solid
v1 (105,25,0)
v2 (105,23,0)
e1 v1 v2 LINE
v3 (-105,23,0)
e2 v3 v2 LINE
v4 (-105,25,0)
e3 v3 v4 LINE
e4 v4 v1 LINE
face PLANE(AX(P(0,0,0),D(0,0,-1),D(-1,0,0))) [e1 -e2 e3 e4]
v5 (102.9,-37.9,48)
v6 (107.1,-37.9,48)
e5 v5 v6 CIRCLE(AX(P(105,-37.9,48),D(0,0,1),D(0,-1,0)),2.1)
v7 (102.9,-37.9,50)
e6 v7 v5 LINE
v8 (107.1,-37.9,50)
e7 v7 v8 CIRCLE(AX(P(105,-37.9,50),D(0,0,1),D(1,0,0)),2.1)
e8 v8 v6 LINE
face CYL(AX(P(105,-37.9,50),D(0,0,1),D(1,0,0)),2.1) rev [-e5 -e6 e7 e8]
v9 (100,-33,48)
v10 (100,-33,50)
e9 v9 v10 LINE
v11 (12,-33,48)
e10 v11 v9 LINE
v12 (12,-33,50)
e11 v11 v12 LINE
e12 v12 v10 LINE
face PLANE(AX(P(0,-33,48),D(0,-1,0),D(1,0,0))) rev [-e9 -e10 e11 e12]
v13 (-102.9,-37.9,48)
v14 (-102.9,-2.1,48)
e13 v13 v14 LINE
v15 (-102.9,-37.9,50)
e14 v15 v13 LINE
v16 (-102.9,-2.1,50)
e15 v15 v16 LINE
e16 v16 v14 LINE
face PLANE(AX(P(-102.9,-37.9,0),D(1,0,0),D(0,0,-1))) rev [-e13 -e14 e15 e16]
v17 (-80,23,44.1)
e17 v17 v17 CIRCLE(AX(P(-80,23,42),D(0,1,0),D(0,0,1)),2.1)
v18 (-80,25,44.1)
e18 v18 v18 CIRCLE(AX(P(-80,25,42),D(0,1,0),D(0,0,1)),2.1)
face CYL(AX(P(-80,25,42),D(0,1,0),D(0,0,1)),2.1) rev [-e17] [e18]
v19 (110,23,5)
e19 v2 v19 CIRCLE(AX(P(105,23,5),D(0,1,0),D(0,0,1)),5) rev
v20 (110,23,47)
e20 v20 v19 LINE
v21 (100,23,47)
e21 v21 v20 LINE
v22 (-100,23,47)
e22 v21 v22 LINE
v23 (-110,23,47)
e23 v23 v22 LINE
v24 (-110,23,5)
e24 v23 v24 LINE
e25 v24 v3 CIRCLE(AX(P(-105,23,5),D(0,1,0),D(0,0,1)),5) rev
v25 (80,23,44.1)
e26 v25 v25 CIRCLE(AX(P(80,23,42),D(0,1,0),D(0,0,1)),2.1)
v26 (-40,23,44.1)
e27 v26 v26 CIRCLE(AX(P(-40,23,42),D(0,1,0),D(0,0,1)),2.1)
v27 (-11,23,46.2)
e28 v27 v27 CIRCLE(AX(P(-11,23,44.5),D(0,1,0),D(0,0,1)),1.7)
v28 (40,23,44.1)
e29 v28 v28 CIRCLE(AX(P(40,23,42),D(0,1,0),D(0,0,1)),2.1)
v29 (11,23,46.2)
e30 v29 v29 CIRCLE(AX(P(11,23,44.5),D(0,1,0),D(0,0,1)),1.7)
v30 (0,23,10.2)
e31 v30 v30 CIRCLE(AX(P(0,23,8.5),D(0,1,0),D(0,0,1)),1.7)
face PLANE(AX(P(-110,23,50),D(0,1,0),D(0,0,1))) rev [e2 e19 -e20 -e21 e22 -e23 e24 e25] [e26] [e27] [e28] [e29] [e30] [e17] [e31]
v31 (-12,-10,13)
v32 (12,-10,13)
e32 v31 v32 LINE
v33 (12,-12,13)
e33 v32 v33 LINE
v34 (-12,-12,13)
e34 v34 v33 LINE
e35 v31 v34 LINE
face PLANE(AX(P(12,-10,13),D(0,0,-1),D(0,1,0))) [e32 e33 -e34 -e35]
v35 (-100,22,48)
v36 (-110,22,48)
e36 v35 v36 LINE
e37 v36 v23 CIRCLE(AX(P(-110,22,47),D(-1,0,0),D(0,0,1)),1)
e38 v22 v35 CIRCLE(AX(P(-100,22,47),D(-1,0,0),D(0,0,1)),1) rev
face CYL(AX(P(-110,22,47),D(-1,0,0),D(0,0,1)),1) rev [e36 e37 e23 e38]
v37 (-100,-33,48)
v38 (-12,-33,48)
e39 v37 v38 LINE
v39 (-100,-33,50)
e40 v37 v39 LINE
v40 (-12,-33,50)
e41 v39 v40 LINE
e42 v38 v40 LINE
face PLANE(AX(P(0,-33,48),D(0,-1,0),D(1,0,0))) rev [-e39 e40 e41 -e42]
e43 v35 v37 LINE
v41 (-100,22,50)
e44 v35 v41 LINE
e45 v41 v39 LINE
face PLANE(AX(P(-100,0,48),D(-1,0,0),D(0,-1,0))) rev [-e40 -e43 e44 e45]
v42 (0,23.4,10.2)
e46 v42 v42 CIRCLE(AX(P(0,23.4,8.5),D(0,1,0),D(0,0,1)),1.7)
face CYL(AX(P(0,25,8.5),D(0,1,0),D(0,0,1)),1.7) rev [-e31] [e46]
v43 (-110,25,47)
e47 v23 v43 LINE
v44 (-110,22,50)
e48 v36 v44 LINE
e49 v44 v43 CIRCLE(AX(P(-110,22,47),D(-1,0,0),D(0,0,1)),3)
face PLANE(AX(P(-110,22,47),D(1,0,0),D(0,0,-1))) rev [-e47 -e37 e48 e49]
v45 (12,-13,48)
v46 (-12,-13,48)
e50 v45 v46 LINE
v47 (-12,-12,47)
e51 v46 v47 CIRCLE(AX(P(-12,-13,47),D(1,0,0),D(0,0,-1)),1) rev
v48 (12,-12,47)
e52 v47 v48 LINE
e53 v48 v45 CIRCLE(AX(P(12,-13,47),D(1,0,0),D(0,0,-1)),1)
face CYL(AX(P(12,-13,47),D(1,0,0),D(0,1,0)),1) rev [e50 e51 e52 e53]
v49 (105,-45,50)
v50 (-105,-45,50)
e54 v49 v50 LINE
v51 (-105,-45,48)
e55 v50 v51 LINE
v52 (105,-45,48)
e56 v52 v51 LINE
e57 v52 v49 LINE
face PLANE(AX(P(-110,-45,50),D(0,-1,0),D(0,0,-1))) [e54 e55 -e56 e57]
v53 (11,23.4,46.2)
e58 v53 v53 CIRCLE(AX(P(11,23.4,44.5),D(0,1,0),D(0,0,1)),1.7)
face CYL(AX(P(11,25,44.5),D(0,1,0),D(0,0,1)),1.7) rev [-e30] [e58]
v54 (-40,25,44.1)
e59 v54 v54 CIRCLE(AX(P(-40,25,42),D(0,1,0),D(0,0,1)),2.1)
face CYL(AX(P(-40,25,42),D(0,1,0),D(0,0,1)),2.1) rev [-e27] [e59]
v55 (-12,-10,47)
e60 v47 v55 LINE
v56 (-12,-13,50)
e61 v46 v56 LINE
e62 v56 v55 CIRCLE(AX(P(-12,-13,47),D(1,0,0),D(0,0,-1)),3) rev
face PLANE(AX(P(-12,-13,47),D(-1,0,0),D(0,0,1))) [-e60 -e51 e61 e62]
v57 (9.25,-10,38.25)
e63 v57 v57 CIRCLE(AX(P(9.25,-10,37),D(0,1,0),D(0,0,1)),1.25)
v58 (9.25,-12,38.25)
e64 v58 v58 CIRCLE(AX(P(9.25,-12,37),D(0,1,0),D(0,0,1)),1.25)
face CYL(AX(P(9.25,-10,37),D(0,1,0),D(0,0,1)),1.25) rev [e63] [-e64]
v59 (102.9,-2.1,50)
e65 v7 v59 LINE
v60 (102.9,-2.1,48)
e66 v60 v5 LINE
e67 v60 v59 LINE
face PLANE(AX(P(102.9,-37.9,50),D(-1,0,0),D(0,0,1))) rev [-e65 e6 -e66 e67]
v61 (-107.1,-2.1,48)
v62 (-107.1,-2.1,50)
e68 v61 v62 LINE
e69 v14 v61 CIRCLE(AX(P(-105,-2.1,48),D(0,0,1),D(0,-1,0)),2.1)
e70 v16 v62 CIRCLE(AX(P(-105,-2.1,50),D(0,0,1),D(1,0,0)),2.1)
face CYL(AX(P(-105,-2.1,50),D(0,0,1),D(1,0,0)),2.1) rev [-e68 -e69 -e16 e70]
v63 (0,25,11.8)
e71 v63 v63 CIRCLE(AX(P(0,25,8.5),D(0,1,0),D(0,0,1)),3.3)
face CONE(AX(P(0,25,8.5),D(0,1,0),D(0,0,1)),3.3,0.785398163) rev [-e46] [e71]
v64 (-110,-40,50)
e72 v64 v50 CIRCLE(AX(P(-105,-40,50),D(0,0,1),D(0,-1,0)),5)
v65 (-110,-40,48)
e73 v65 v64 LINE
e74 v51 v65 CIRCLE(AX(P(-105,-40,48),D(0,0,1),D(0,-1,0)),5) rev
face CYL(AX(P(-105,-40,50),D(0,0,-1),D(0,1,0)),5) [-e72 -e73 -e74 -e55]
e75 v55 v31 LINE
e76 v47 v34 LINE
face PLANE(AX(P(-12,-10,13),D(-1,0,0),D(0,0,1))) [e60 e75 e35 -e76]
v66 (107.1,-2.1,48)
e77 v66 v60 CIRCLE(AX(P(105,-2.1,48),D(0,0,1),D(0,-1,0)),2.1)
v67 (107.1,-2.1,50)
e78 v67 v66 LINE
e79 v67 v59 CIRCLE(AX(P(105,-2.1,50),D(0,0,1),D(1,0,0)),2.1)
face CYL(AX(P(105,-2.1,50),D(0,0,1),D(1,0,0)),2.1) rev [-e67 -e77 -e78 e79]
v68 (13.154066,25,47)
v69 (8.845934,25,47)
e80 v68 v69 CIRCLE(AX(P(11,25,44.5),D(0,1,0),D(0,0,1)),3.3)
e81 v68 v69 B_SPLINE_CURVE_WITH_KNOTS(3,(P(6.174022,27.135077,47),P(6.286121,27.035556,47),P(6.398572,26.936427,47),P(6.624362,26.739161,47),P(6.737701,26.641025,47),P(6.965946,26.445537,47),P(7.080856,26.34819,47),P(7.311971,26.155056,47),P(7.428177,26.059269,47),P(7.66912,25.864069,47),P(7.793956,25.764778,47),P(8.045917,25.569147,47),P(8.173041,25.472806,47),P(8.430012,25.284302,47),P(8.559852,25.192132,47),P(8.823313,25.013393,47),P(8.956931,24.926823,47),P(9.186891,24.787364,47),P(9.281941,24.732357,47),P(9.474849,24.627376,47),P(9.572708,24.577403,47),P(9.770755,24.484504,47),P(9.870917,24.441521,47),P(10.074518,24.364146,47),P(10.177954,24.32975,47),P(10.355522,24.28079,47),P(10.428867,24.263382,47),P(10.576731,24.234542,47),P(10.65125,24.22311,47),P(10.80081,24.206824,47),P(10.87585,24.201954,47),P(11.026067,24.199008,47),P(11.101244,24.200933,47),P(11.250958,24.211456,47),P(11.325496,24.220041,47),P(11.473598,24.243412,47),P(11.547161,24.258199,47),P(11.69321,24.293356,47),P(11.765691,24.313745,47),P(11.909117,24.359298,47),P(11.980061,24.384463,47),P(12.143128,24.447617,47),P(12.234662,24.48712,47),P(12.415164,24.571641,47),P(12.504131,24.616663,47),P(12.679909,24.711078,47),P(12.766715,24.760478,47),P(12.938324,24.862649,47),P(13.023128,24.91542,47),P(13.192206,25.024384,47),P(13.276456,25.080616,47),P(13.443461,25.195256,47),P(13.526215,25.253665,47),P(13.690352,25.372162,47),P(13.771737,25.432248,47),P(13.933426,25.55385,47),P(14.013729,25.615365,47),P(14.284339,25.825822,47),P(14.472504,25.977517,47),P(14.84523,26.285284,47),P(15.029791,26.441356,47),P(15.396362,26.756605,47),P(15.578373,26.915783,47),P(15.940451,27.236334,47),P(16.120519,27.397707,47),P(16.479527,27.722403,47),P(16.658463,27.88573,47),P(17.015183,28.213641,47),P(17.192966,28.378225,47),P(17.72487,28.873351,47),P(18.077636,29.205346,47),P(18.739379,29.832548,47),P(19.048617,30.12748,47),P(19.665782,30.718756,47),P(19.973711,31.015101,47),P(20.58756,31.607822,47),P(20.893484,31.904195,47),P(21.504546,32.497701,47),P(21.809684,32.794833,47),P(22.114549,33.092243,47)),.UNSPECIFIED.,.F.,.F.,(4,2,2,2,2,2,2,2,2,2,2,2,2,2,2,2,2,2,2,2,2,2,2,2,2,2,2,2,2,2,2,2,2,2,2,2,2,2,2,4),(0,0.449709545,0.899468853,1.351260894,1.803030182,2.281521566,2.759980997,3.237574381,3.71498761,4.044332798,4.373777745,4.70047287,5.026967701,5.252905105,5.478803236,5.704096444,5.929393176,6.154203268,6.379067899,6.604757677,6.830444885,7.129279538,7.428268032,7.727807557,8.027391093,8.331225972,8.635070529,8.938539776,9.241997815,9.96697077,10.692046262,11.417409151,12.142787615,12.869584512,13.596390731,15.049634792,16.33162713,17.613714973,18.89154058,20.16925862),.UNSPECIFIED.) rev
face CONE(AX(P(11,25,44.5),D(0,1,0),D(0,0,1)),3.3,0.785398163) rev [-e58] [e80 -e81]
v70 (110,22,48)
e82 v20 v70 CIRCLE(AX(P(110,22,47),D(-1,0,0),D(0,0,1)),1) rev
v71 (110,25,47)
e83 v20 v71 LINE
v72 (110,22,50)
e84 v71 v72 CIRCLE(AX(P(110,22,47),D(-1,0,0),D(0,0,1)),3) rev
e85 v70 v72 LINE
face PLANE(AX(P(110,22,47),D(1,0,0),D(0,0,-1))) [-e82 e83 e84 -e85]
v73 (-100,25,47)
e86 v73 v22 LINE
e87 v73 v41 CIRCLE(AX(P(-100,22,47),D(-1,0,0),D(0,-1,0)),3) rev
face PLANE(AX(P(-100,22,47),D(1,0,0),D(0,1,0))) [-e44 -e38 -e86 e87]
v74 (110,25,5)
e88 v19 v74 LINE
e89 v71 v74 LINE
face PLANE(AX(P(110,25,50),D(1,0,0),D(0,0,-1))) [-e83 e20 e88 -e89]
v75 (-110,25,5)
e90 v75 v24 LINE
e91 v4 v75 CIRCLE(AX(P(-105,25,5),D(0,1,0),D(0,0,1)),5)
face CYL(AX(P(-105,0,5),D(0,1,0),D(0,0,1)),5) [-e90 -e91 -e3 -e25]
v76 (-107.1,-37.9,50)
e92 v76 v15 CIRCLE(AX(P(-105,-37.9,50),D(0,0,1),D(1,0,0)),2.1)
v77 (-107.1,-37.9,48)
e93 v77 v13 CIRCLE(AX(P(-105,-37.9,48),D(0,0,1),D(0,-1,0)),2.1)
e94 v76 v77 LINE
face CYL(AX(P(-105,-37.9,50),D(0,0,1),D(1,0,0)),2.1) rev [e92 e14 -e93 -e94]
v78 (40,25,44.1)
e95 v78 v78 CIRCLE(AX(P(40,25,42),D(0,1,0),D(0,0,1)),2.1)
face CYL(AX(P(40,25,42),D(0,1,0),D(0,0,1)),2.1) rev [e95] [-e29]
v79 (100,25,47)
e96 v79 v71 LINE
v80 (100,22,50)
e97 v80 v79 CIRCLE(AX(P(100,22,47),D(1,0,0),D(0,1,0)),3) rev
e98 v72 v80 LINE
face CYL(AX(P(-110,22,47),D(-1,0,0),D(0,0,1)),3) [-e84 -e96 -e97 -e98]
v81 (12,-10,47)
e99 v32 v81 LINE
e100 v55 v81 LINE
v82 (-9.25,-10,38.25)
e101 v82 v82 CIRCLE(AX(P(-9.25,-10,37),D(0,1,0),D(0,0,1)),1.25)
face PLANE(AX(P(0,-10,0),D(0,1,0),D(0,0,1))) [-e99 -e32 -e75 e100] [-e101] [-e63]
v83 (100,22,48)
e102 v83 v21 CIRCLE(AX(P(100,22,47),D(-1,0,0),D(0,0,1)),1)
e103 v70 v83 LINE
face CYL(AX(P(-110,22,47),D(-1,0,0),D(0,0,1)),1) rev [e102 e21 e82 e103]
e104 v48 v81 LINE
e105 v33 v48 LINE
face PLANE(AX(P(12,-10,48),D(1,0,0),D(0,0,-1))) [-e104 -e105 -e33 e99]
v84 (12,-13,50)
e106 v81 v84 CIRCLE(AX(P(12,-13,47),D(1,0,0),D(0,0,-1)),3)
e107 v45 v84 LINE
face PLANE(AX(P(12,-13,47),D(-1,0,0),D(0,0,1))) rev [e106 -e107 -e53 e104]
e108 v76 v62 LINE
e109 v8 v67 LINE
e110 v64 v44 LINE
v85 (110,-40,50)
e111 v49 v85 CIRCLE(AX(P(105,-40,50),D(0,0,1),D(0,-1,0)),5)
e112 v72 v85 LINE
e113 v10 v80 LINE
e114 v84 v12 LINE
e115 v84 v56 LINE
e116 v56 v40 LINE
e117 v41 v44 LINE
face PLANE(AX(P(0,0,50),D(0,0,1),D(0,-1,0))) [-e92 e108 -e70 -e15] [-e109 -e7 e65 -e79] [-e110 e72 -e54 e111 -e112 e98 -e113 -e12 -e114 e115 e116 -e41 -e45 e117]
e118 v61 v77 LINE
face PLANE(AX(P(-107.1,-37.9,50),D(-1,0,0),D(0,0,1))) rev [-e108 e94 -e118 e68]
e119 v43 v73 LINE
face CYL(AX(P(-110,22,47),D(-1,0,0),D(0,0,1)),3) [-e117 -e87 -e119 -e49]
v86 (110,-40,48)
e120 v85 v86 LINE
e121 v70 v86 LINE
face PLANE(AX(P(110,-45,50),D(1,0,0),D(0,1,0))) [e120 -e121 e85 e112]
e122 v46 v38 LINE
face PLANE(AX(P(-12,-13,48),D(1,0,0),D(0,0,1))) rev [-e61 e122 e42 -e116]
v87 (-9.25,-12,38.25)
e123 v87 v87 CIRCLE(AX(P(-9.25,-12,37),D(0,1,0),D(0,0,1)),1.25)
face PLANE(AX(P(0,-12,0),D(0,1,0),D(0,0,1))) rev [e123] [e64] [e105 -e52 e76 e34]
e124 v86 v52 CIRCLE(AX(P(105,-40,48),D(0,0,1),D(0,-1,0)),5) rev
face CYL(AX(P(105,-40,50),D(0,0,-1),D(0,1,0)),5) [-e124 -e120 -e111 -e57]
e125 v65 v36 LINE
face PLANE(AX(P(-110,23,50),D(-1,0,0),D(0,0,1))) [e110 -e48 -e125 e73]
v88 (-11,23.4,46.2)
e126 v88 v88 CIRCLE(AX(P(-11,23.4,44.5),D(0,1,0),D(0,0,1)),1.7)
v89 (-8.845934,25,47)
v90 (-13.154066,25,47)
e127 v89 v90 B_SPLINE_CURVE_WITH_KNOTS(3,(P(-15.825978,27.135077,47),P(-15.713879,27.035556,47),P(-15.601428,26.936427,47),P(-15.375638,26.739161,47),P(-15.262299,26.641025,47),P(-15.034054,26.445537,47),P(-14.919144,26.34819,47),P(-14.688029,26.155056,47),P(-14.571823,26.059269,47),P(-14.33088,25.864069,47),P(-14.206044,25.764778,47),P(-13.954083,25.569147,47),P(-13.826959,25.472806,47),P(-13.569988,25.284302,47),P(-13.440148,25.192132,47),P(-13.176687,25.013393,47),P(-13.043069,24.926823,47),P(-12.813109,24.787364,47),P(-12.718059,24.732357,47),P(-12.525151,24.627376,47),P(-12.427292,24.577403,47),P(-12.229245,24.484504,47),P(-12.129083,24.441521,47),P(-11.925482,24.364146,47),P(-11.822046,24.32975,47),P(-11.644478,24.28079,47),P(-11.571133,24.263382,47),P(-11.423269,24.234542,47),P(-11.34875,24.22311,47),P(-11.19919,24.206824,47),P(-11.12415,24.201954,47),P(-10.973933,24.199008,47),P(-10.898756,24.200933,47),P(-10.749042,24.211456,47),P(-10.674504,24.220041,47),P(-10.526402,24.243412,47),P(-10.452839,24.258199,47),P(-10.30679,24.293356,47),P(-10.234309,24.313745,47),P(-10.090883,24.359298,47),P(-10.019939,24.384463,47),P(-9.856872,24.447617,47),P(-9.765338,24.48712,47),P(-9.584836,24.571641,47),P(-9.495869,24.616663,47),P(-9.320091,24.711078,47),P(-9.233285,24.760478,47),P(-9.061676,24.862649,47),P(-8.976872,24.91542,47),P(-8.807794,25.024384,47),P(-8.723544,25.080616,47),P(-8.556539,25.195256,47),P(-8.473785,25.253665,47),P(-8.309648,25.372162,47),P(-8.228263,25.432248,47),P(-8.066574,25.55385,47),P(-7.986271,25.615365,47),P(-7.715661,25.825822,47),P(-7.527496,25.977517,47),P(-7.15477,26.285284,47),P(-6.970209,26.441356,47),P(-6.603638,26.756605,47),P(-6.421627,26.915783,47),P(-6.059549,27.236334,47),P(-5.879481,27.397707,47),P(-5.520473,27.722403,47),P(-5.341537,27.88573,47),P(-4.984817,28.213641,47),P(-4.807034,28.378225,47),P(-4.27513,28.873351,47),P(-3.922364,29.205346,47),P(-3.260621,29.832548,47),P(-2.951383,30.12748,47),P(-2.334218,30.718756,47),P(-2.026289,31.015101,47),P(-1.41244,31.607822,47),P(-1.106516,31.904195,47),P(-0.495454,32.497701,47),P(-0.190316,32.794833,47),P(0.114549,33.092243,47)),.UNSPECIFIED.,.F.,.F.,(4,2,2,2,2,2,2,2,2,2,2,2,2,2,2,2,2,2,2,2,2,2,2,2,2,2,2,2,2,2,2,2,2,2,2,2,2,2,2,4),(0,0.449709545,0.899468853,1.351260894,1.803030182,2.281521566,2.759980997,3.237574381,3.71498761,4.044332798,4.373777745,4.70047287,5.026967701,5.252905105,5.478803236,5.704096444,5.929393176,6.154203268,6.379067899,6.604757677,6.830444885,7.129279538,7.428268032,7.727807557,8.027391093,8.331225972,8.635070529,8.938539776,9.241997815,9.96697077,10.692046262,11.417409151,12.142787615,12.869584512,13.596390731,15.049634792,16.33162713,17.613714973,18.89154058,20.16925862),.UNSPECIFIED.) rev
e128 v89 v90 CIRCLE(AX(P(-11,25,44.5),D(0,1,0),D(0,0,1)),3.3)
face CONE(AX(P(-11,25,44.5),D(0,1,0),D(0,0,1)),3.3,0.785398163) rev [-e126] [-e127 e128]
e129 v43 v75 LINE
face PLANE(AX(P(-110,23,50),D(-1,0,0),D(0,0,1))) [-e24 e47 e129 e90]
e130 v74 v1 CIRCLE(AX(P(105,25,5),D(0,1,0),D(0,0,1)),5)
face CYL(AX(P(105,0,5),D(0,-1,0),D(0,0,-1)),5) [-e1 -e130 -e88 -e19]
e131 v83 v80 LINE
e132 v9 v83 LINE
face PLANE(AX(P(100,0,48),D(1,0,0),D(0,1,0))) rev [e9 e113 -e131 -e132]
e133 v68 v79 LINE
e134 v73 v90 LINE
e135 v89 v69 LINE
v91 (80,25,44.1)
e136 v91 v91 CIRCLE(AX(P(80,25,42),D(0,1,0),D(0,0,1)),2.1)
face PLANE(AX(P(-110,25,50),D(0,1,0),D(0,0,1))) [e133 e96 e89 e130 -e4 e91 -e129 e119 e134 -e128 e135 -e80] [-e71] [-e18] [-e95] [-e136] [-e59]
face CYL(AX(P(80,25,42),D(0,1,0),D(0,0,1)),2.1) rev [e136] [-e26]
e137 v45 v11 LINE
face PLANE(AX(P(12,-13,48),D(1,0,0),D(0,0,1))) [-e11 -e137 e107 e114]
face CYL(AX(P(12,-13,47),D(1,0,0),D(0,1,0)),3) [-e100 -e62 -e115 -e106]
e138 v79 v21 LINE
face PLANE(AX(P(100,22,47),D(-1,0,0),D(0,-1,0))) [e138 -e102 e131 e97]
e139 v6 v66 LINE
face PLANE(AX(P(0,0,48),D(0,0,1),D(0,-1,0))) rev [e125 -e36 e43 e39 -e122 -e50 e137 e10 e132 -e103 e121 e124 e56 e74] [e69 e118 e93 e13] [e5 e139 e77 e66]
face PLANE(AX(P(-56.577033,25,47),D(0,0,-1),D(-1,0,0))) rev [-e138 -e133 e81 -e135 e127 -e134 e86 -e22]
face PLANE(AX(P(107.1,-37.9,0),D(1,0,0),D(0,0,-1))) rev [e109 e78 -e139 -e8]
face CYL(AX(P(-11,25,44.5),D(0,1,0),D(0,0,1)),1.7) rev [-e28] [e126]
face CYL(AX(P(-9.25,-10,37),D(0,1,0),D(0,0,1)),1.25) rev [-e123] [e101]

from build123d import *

# Parameters (mm, degrees)
SM_BASE_FLANGE_1_OUTLINE_W       = 220
SM_BASE_FLANGE_1_OUTLINE_H       = 2
SM_BASE_FLANGE_1_DEPTH           = 50
HOLE_WIZARD_1_AT_2_COUNT         = 2
HOLE_WIZARD_1_AT_2_PITCH         = 37.643060449
HOLE_WIZARD_1_AT_3_COUNT         = 2
HOLE_WIZARD_1_AT_3_PITCH         = 37.643060449
HOLE_WIZARD_4_2_4_2_1_D          = 4.2
SM_EDGE_FLANGE_1_STRIP_W         = 10
SM_EDGE_FLANGE_1_STRIP_H         = 2
SM_EDGE_FLANGE_1_STRIP_CUT_DEPTH = 220
SM_EDGE_FLANGE_1_DEPTH           = 220
SKETCH_16_W                      = 200
SKETCH_16_H                      = 58
CUT_EXTRUDE_1_DEPTH              = 3
SM_EDGE_FLANGE_2_DEPTH           = 24
HOLE_START                       = 48
HOLE_WIZARD_4_2_4_2_1_2_DEPTH    = 2
FILLET_1_R                       = 5
SKETCH_23_W                      = 1.25
SKETCH_23_H                      = 35
HOLE_WIZARD_M3_1_AT_2_COUNT      = 2
HOLE_WIZARD_M3_1_AT_2_PITCH      = 18.5


# Read off the part's stored shape, not the designer's step: 基体-法兰1, Ø4.2 (4.2) 直径槽口1
# Sheet-metal steps are written as plain solids
with BuildPart() as part:
    # 基体-法兰1 outline → 基体-法兰1 (new body)
    with BuildSketch(Plane.XY):
        with Locations((0, 24)):
            Rectangle(SM_BASE_FLANGE_1_OUTLINE_W, SM_BASE_FLANGE_1_OUTLINE_H)
    extrude(amount=SM_BASE_FLANGE_1_DEPTH)

    # 草图9 → 打孔尺寸(%根据)开槽沉头木螺钉的类型1 (revolve, cut)
    with BuildSketch(Plane(origin=(0, 25, 8.5), x_dir=(0, 0, 1), z_dir=(1, 0, 0))):
        Polygon((0, 0), (0, 2), (1.7, 2), (1.7, 1.6), (3.3, 0), align=None)
    hole_wizard_1 = revolve(axis=Axis((0, 31.35, 8.5), (0, -1, 0)), mode=Mode.SUBTRACT)

    # 打孔尺寸(%根据)开槽沉头木螺钉的类型1 at 2: 打孔尺寸(%根据)开槽沉头木螺钉的类型1 ×2
    with Locations(*[Vector(-0.2922185355990202, 0, 0.956351571051339) * (i * HOLE_WIZARD_1_AT_2_PITCH) for i in range(1, HOLE_WIZARD_1_AT_2_COUNT)]):
        add(hole_wizard_1, mode=Mode.SUBTRACT)

    # 打孔尺寸(%根据)开槽沉头木螺钉的类型1 at 3: 打孔尺寸(%根据)开槽沉头木螺钉的类型1 ×2
    with Locations(*[Vector(0.29221853559902033, 0, 0.956351571051339) * (i * HOLE_WIZARD_1_AT_3_PITCH) for i in range(1, HOLE_WIZARD_1_AT_3_COUNT)]):
        add(hole_wizard_1, mode=Mode.SUBTRACT)

    # Hole Wizard 4.2 _4.2_ _1 (through all)
    with Locations(Plane(origin=(0, 25, 0), x_dir=(1, 0, 0), z_dir=(0, 1, 0))):
        with Locations((-40, -42), (-80, -42), (40, -42), (80, -42)):
            Hole(HOLE_WIZARD_4_2_4_2_1_D / 2)

    # 边线-法兰1 strip (across the edge) → 边线-法兰1 strip cut (cut)
    with BuildSketch(Plane(origin=(110, 23, 50), x_dir=(0, 0, -1), z_dir=(-1, 0, 0))):
        with Locations((-2, -1)):
            Rectangle(SM_EDGE_FLANGE_1_STRIP_W, SM_EDGE_FLANGE_1_STRIP_H)
    extrude(amount=SM_EDGE_FLANGE_1_STRIP_CUT_DEPTH, mode=Mode.SUBTRACT)

    # 边线-法兰1 section (across the edge) → 边线-法兰1 (add)
    with BuildSketch(Plane(origin=(110, 23, 50), x_dir=(0, 0, -1), z_dir=(-1, 0, 0))):
        with BuildLine():
            Line((0, 1), (0, 68))
            Line((0, 68), (2, 68))
            Line((2, 68), (2, 1))
            ThreePointArc((2, 1), (2.292893219, 0.292893219), (3, 0))
            Line((3, 0), (3, -2))
            ThreePointArc((3, -2), (0.878679656, -1.121320344), (0, 1))
        make_face()
    extrude(amount=SM_EDGE_FLANGE_1_DEPTH)

    # 草图16 → 切除-拉伸1 (cut)
    with BuildSketch(Plane.XY.offset(50)):
        with Locations((0, -4)):
            Rectangle(SKETCH_16_W, SKETCH_16_H)
    extrude(amount=-CUT_EXTRUDE_1_DEPTH, mode=Mode.SUBTRACT)

    # 边线-法兰2 section (across the edge) → 边线-法兰2 (add)
    with BuildSketch(Plane(origin=(-12, -10, 48), x_dir=(0, -1, 0), z_dir=(1, 0, 0))):
        with BuildLine():
            Line((0, 1), (0, 35))
            Line((0, 35), (2, 35))
            Line((2, 35), (2, 1))
            ThreePointArc((2, 1), (2.292893219, 0.292893219), (3, 0))
            Line((3, 0), (23, 0))
            Line((23, 0), (23, -2))
            Line((23, -2), (3, -2))
            ThreePointArc((3, -2), (0.878679656, -1.121320344), (0, 1))
        make_face()
    extrude(amount=SM_EDGE_FLANGE_2_DEPTH)

    # Hole Wizard 4.2 _4.2_ _1 2 outline → Hole Wizard 4.2 _4.2_ _1 2 (cut)
    with BuildSketch(Plane.XY.offset(HOLE_START)):
        with BuildLine():
            ThreePointArc((107.1, -2.1), (105, 0), (102.9, -2.1))
            Line((102.9, -2.1), (102.9, -37.9))
            ThreePointArc((102.9, -37.9), (105, -40), (107.1, -37.9))
            Line((107.1, -37.9), (107.1, -2.1))
        make_face()
        with BuildLine():
            Line((-102.9, -37.9), (-102.9, -2.1))
            ThreePointArc((-102.9, -2.1), (-105, 0), (-107.1, -2.1))
            Line((-107.1, -2.1), (-107.1, -37.9))
            ThreePointArc((-107.1, -37.9), (-105, -40), (-102.9, -37.9))
        make_face()
    extrude(amount=HOLE_WIZARD_4_2_4_2_1_2_DEPTH, mode=Mode.SUBTRACT)

    # 圆角1
    fillet_1_edges = [part.edges().sort_by_distance(p)[0] for p in [
        (-110, 24, 0),
        (110, 24, 0),
        (110, -45, 49),
        (-110, -45, 49),
    ]]
    fillet(fillet_1_edges, radius=FILLET_1_R)

    # 草图23 → M3 螺纹孔1 (revolve, cut)
    with BuildSketch(Plane(origin=(9.25, -10, 37), x_dir=(0, 0, 1), z_dir=(1, 0, 0))):
        with Locations((0.625, 17.5)):
            Rectangle(SKETCH_23_W, SKETCH_23_H)
    hole_wizard_m3_1 = revolve(axis=Axis((9.25, -3.65, 37), (0, -1, 0)), mode=Mode.SUBTRACT)

    # M3 螺纹孔1 at 2: M3 螺纹孔1 ×2
    with Locations(*[(-i * HOLE_WIZARD_M3_1_AT_2_PITCH, 0, 0) for i in range(1, HOLE_WIZARD_M3_1_AT_2_COUNT)]):
        add(hole_wizard_m3_1, mode=Mode.SUBTRACT)


solid = part.part
